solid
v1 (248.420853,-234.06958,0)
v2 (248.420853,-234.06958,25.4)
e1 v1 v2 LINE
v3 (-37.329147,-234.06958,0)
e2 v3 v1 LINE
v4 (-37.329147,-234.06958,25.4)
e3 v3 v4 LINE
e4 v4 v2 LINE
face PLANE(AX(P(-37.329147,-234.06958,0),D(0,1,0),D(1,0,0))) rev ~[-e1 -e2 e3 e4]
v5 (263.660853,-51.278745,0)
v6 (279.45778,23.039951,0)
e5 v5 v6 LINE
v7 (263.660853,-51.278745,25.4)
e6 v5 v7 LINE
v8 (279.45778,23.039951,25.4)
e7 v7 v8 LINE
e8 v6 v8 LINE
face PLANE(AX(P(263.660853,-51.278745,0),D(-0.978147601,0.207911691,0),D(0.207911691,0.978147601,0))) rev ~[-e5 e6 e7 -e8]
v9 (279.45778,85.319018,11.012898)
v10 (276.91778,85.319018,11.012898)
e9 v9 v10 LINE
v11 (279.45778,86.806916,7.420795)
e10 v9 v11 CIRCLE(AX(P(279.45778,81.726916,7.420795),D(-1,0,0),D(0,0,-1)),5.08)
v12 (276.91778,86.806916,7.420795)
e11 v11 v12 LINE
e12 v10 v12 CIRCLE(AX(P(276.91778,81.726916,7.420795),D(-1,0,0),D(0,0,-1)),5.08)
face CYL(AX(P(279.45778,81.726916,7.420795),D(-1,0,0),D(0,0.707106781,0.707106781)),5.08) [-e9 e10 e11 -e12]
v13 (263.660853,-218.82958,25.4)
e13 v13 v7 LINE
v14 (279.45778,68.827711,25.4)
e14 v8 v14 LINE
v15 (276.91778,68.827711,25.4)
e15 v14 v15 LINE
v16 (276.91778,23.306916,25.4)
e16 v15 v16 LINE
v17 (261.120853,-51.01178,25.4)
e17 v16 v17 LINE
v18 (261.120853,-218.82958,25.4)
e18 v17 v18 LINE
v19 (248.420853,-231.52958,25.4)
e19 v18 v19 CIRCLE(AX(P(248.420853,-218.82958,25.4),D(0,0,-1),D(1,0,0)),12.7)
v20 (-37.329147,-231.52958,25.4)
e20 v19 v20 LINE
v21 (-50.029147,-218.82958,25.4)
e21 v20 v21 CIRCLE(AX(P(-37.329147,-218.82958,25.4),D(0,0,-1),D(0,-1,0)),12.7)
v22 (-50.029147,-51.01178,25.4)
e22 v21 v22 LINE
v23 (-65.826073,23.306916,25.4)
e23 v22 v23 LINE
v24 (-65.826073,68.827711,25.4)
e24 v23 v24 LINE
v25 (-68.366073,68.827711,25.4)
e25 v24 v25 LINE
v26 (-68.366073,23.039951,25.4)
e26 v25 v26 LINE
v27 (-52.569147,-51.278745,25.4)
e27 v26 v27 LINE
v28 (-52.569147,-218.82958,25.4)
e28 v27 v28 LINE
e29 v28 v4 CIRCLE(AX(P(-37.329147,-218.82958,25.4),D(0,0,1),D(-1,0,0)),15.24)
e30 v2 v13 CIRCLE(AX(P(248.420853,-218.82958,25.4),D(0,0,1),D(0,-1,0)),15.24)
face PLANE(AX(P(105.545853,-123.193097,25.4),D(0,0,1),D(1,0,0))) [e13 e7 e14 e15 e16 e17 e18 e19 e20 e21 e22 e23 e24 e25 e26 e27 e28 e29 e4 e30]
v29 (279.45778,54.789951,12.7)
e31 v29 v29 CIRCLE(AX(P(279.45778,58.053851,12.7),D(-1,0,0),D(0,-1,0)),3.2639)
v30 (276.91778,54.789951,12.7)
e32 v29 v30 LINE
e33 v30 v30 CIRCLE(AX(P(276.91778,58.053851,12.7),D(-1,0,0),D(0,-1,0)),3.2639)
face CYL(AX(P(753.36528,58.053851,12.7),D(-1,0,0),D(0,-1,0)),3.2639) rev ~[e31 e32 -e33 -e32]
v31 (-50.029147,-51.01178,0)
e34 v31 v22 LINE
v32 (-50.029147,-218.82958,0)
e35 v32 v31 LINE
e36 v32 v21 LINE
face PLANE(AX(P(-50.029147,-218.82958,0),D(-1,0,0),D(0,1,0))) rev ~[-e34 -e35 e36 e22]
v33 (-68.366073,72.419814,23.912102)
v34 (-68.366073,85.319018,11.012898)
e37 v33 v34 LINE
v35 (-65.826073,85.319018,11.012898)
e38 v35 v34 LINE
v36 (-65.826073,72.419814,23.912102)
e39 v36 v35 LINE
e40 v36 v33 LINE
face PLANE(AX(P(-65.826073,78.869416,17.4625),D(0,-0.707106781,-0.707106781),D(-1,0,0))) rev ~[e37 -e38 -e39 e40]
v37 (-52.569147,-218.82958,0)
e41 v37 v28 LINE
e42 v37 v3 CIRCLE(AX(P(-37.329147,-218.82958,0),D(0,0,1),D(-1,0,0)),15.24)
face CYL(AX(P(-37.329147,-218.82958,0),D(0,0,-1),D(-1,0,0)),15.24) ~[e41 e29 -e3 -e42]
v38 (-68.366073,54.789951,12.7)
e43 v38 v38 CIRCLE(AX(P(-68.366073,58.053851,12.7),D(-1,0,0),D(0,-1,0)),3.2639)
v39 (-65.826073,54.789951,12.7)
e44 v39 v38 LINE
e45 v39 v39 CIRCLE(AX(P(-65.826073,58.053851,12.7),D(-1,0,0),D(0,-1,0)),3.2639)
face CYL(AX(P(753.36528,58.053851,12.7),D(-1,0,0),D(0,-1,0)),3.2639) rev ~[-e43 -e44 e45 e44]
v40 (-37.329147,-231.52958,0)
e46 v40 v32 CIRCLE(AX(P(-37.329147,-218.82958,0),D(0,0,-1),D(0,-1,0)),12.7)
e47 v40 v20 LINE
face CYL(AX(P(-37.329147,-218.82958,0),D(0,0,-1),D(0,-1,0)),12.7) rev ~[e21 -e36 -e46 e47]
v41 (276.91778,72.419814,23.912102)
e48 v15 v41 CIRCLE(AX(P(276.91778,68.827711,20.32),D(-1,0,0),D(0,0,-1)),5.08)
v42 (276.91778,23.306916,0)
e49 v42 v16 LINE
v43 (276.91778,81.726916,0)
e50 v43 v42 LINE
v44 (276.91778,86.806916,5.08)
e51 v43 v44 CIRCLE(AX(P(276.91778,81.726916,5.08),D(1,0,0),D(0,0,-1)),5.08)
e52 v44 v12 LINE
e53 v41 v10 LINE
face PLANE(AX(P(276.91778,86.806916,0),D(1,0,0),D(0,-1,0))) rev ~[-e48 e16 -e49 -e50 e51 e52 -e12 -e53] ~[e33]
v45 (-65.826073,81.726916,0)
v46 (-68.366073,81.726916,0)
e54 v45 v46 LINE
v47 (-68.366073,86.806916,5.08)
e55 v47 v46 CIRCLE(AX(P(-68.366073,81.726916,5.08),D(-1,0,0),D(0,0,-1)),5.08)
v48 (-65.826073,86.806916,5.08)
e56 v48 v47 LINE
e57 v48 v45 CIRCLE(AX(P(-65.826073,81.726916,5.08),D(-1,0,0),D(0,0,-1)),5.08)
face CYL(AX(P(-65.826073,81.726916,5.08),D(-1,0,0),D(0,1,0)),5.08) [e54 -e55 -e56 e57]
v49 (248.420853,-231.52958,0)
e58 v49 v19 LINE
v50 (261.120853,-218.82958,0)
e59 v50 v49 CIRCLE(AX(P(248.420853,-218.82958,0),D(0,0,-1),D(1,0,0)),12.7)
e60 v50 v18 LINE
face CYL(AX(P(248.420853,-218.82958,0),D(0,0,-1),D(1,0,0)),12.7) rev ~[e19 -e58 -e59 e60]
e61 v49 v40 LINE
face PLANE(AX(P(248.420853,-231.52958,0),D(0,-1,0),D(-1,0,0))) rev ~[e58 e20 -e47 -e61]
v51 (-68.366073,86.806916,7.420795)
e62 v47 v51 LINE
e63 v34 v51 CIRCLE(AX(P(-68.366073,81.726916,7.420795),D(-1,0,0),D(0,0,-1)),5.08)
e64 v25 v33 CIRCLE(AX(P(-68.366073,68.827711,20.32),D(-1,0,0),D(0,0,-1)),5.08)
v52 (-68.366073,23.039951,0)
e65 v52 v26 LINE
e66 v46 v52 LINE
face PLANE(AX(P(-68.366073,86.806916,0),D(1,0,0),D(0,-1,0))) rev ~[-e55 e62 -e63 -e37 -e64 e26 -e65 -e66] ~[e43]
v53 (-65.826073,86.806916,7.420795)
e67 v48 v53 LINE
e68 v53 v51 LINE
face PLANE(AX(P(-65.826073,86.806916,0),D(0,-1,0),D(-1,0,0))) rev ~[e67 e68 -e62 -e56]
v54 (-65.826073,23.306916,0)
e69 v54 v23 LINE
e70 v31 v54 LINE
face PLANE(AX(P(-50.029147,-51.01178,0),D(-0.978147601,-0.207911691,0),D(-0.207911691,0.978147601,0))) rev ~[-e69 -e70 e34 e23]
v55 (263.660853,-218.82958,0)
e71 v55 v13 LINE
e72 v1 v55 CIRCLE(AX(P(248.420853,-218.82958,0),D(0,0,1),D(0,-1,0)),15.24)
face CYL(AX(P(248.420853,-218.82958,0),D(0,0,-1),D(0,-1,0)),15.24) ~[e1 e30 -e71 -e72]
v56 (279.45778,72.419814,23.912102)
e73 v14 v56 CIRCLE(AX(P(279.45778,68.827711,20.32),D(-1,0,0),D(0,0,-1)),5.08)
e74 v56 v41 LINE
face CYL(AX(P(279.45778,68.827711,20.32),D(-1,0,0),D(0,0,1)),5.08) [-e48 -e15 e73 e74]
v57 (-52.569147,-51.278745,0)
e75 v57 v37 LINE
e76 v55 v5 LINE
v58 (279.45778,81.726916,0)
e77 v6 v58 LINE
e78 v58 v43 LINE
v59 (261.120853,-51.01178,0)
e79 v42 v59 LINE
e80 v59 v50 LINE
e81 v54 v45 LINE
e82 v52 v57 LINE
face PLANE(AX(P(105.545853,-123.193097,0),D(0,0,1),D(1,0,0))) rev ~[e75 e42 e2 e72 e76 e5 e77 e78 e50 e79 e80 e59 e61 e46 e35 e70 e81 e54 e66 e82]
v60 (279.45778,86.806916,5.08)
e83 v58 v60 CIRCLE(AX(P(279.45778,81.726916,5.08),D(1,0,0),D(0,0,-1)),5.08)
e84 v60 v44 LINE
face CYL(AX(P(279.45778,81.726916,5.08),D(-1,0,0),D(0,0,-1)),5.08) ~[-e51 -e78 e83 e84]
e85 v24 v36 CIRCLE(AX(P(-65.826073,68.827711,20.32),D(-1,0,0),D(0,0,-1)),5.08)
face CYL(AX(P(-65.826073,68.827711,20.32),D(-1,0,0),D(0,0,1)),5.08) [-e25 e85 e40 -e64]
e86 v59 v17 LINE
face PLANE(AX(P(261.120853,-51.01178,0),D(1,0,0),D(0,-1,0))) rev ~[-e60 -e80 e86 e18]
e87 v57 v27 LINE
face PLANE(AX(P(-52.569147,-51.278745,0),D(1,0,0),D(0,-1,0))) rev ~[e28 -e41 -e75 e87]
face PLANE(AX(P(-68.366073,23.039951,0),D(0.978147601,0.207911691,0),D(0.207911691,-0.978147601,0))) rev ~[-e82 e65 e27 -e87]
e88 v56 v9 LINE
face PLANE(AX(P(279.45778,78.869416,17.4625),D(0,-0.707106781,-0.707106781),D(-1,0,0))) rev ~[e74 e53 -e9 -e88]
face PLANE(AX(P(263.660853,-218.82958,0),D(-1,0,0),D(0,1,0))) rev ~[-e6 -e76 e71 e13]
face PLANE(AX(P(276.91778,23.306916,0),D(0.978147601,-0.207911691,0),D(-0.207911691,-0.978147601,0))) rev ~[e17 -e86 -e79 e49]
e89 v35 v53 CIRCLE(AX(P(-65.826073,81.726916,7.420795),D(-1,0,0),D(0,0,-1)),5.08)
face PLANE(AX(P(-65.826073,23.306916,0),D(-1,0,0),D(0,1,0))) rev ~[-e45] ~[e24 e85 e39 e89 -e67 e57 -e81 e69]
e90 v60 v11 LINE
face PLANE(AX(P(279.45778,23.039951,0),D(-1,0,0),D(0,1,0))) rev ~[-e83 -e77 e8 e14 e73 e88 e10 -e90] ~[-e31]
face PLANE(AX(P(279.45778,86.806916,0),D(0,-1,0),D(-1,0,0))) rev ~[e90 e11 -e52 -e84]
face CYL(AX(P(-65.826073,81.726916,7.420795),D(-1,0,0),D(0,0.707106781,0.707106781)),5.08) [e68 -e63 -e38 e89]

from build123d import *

# Parameters (mm, degrees)
F1_DEPTH = 25.4
F3_D     = 6.5278
F4_SIZE2 = 15.875
F4_SIZE  = 15.875
F5_R     = 5.08


with BuildPart() as f1:
    # F0 (on Top) → F1 (new body)
    with BuildSketch(Plane.XY):
        with BuildLine():
            Line((-65.826073072, 23.3069159811), (-65.826073072, 86.8069159811))
            Line((-65.826073072, 86.8069159811), (-68.366073072, 86.8069159811))
            Line((-68.366073072, 86.8069159811), (-68.366073072, 23.0399512236))
            Line((-68.366073072, 23.0399512236), (-52.5691465571, -51.2787448955))
            Line((-52.5691465571, -51.2787448955), (-52.5691465571, -218.829580138))
            ThreePointArc((-52.5691465571, -218.829580138), (-48.1054539024, -229.6058874832), (-37.3291465571, -234.069580138))
            Line((-37.3291465571, -234.069580138), (248.4208534429, -234.069580138))
            ThreePointArc((248.4208534429, -234.069580138), (259.1971607882, -229.6058874832), (263.6608534429, -218.829580138))
            Line((263.6608534429, -218.829580138), (263.6608534429, -51.2787448955))
            Line((263.6608534429, -51.2787448955), (279.4577799578, 23.0399512236))
            Line((279.4577799578, 23.0399512236), (279.4577799578, 86.8069159811))
            Line((279.4577799578, 86.8069159811), (276.9177799578, 86.8069159811))
            Line((276.9177799578, 86.8069159811), (276.9177799578, 23.3069159811))
            Line((276.9177799578, 23.3069159811), (261.1208534429, -51.011780138))
            Line((261.1208534429, -51.011780138), (261.1208534429, -218.829580138))
            ThreePointArc((261.1208534429, -218.829580138), (257.401109564, -227.809836259), (248.4208534429, -231.529580138))
            Line((248.4208534429, -231.529580138), (-37.3291465571, -231.529580138))
            ThreePointArc((-37.3291465571, -231.529580138), (-46.3094026781, -227.809836259), (-50.0291465571, -218.829580138))
            Line((-50.0291465571, -218.829580138), (-50.0291465571, -51.011780138))
            Line((-50.0291465571, -51.011780138), (-65.826073072, 23.3069159811))
        make_face()
    extrude(amount=F1_DEPTH)

    # F3 (through all)
    with Locations(Plane.YZ.offset(279.4577799578)):
        with Locations((58.0538512236, 12.7)):
            Hole(F3_D / 2)

    # F4
    f4_edges = [f1.edges().sort_by_distance(p)[0] for p in [
        (278.18778, 86.806916, 25.4),
        (-67.096073, 86.806916, 25.4),
    ]]
    chamfer(f4_edges, length=F4_SIZE, length2=F4_SIZE2)

    # F5
    f5_edges = [f1.edges().sort_by_distance(p)[0] for p in [
        (-67.096073, 70.931916, 25.4),
        (278.18778, 70.931916, 25.4),
        (278.18778, 86.806916, 9.525),
        (-67.096073, 86.806916, 9.525),
        (-67.096073, 86.806916, 0),
        (278.18778, 86.806916, 0),
    ]]
    fillet(f5_edges, radius=F5_R)


solid = f1.part
